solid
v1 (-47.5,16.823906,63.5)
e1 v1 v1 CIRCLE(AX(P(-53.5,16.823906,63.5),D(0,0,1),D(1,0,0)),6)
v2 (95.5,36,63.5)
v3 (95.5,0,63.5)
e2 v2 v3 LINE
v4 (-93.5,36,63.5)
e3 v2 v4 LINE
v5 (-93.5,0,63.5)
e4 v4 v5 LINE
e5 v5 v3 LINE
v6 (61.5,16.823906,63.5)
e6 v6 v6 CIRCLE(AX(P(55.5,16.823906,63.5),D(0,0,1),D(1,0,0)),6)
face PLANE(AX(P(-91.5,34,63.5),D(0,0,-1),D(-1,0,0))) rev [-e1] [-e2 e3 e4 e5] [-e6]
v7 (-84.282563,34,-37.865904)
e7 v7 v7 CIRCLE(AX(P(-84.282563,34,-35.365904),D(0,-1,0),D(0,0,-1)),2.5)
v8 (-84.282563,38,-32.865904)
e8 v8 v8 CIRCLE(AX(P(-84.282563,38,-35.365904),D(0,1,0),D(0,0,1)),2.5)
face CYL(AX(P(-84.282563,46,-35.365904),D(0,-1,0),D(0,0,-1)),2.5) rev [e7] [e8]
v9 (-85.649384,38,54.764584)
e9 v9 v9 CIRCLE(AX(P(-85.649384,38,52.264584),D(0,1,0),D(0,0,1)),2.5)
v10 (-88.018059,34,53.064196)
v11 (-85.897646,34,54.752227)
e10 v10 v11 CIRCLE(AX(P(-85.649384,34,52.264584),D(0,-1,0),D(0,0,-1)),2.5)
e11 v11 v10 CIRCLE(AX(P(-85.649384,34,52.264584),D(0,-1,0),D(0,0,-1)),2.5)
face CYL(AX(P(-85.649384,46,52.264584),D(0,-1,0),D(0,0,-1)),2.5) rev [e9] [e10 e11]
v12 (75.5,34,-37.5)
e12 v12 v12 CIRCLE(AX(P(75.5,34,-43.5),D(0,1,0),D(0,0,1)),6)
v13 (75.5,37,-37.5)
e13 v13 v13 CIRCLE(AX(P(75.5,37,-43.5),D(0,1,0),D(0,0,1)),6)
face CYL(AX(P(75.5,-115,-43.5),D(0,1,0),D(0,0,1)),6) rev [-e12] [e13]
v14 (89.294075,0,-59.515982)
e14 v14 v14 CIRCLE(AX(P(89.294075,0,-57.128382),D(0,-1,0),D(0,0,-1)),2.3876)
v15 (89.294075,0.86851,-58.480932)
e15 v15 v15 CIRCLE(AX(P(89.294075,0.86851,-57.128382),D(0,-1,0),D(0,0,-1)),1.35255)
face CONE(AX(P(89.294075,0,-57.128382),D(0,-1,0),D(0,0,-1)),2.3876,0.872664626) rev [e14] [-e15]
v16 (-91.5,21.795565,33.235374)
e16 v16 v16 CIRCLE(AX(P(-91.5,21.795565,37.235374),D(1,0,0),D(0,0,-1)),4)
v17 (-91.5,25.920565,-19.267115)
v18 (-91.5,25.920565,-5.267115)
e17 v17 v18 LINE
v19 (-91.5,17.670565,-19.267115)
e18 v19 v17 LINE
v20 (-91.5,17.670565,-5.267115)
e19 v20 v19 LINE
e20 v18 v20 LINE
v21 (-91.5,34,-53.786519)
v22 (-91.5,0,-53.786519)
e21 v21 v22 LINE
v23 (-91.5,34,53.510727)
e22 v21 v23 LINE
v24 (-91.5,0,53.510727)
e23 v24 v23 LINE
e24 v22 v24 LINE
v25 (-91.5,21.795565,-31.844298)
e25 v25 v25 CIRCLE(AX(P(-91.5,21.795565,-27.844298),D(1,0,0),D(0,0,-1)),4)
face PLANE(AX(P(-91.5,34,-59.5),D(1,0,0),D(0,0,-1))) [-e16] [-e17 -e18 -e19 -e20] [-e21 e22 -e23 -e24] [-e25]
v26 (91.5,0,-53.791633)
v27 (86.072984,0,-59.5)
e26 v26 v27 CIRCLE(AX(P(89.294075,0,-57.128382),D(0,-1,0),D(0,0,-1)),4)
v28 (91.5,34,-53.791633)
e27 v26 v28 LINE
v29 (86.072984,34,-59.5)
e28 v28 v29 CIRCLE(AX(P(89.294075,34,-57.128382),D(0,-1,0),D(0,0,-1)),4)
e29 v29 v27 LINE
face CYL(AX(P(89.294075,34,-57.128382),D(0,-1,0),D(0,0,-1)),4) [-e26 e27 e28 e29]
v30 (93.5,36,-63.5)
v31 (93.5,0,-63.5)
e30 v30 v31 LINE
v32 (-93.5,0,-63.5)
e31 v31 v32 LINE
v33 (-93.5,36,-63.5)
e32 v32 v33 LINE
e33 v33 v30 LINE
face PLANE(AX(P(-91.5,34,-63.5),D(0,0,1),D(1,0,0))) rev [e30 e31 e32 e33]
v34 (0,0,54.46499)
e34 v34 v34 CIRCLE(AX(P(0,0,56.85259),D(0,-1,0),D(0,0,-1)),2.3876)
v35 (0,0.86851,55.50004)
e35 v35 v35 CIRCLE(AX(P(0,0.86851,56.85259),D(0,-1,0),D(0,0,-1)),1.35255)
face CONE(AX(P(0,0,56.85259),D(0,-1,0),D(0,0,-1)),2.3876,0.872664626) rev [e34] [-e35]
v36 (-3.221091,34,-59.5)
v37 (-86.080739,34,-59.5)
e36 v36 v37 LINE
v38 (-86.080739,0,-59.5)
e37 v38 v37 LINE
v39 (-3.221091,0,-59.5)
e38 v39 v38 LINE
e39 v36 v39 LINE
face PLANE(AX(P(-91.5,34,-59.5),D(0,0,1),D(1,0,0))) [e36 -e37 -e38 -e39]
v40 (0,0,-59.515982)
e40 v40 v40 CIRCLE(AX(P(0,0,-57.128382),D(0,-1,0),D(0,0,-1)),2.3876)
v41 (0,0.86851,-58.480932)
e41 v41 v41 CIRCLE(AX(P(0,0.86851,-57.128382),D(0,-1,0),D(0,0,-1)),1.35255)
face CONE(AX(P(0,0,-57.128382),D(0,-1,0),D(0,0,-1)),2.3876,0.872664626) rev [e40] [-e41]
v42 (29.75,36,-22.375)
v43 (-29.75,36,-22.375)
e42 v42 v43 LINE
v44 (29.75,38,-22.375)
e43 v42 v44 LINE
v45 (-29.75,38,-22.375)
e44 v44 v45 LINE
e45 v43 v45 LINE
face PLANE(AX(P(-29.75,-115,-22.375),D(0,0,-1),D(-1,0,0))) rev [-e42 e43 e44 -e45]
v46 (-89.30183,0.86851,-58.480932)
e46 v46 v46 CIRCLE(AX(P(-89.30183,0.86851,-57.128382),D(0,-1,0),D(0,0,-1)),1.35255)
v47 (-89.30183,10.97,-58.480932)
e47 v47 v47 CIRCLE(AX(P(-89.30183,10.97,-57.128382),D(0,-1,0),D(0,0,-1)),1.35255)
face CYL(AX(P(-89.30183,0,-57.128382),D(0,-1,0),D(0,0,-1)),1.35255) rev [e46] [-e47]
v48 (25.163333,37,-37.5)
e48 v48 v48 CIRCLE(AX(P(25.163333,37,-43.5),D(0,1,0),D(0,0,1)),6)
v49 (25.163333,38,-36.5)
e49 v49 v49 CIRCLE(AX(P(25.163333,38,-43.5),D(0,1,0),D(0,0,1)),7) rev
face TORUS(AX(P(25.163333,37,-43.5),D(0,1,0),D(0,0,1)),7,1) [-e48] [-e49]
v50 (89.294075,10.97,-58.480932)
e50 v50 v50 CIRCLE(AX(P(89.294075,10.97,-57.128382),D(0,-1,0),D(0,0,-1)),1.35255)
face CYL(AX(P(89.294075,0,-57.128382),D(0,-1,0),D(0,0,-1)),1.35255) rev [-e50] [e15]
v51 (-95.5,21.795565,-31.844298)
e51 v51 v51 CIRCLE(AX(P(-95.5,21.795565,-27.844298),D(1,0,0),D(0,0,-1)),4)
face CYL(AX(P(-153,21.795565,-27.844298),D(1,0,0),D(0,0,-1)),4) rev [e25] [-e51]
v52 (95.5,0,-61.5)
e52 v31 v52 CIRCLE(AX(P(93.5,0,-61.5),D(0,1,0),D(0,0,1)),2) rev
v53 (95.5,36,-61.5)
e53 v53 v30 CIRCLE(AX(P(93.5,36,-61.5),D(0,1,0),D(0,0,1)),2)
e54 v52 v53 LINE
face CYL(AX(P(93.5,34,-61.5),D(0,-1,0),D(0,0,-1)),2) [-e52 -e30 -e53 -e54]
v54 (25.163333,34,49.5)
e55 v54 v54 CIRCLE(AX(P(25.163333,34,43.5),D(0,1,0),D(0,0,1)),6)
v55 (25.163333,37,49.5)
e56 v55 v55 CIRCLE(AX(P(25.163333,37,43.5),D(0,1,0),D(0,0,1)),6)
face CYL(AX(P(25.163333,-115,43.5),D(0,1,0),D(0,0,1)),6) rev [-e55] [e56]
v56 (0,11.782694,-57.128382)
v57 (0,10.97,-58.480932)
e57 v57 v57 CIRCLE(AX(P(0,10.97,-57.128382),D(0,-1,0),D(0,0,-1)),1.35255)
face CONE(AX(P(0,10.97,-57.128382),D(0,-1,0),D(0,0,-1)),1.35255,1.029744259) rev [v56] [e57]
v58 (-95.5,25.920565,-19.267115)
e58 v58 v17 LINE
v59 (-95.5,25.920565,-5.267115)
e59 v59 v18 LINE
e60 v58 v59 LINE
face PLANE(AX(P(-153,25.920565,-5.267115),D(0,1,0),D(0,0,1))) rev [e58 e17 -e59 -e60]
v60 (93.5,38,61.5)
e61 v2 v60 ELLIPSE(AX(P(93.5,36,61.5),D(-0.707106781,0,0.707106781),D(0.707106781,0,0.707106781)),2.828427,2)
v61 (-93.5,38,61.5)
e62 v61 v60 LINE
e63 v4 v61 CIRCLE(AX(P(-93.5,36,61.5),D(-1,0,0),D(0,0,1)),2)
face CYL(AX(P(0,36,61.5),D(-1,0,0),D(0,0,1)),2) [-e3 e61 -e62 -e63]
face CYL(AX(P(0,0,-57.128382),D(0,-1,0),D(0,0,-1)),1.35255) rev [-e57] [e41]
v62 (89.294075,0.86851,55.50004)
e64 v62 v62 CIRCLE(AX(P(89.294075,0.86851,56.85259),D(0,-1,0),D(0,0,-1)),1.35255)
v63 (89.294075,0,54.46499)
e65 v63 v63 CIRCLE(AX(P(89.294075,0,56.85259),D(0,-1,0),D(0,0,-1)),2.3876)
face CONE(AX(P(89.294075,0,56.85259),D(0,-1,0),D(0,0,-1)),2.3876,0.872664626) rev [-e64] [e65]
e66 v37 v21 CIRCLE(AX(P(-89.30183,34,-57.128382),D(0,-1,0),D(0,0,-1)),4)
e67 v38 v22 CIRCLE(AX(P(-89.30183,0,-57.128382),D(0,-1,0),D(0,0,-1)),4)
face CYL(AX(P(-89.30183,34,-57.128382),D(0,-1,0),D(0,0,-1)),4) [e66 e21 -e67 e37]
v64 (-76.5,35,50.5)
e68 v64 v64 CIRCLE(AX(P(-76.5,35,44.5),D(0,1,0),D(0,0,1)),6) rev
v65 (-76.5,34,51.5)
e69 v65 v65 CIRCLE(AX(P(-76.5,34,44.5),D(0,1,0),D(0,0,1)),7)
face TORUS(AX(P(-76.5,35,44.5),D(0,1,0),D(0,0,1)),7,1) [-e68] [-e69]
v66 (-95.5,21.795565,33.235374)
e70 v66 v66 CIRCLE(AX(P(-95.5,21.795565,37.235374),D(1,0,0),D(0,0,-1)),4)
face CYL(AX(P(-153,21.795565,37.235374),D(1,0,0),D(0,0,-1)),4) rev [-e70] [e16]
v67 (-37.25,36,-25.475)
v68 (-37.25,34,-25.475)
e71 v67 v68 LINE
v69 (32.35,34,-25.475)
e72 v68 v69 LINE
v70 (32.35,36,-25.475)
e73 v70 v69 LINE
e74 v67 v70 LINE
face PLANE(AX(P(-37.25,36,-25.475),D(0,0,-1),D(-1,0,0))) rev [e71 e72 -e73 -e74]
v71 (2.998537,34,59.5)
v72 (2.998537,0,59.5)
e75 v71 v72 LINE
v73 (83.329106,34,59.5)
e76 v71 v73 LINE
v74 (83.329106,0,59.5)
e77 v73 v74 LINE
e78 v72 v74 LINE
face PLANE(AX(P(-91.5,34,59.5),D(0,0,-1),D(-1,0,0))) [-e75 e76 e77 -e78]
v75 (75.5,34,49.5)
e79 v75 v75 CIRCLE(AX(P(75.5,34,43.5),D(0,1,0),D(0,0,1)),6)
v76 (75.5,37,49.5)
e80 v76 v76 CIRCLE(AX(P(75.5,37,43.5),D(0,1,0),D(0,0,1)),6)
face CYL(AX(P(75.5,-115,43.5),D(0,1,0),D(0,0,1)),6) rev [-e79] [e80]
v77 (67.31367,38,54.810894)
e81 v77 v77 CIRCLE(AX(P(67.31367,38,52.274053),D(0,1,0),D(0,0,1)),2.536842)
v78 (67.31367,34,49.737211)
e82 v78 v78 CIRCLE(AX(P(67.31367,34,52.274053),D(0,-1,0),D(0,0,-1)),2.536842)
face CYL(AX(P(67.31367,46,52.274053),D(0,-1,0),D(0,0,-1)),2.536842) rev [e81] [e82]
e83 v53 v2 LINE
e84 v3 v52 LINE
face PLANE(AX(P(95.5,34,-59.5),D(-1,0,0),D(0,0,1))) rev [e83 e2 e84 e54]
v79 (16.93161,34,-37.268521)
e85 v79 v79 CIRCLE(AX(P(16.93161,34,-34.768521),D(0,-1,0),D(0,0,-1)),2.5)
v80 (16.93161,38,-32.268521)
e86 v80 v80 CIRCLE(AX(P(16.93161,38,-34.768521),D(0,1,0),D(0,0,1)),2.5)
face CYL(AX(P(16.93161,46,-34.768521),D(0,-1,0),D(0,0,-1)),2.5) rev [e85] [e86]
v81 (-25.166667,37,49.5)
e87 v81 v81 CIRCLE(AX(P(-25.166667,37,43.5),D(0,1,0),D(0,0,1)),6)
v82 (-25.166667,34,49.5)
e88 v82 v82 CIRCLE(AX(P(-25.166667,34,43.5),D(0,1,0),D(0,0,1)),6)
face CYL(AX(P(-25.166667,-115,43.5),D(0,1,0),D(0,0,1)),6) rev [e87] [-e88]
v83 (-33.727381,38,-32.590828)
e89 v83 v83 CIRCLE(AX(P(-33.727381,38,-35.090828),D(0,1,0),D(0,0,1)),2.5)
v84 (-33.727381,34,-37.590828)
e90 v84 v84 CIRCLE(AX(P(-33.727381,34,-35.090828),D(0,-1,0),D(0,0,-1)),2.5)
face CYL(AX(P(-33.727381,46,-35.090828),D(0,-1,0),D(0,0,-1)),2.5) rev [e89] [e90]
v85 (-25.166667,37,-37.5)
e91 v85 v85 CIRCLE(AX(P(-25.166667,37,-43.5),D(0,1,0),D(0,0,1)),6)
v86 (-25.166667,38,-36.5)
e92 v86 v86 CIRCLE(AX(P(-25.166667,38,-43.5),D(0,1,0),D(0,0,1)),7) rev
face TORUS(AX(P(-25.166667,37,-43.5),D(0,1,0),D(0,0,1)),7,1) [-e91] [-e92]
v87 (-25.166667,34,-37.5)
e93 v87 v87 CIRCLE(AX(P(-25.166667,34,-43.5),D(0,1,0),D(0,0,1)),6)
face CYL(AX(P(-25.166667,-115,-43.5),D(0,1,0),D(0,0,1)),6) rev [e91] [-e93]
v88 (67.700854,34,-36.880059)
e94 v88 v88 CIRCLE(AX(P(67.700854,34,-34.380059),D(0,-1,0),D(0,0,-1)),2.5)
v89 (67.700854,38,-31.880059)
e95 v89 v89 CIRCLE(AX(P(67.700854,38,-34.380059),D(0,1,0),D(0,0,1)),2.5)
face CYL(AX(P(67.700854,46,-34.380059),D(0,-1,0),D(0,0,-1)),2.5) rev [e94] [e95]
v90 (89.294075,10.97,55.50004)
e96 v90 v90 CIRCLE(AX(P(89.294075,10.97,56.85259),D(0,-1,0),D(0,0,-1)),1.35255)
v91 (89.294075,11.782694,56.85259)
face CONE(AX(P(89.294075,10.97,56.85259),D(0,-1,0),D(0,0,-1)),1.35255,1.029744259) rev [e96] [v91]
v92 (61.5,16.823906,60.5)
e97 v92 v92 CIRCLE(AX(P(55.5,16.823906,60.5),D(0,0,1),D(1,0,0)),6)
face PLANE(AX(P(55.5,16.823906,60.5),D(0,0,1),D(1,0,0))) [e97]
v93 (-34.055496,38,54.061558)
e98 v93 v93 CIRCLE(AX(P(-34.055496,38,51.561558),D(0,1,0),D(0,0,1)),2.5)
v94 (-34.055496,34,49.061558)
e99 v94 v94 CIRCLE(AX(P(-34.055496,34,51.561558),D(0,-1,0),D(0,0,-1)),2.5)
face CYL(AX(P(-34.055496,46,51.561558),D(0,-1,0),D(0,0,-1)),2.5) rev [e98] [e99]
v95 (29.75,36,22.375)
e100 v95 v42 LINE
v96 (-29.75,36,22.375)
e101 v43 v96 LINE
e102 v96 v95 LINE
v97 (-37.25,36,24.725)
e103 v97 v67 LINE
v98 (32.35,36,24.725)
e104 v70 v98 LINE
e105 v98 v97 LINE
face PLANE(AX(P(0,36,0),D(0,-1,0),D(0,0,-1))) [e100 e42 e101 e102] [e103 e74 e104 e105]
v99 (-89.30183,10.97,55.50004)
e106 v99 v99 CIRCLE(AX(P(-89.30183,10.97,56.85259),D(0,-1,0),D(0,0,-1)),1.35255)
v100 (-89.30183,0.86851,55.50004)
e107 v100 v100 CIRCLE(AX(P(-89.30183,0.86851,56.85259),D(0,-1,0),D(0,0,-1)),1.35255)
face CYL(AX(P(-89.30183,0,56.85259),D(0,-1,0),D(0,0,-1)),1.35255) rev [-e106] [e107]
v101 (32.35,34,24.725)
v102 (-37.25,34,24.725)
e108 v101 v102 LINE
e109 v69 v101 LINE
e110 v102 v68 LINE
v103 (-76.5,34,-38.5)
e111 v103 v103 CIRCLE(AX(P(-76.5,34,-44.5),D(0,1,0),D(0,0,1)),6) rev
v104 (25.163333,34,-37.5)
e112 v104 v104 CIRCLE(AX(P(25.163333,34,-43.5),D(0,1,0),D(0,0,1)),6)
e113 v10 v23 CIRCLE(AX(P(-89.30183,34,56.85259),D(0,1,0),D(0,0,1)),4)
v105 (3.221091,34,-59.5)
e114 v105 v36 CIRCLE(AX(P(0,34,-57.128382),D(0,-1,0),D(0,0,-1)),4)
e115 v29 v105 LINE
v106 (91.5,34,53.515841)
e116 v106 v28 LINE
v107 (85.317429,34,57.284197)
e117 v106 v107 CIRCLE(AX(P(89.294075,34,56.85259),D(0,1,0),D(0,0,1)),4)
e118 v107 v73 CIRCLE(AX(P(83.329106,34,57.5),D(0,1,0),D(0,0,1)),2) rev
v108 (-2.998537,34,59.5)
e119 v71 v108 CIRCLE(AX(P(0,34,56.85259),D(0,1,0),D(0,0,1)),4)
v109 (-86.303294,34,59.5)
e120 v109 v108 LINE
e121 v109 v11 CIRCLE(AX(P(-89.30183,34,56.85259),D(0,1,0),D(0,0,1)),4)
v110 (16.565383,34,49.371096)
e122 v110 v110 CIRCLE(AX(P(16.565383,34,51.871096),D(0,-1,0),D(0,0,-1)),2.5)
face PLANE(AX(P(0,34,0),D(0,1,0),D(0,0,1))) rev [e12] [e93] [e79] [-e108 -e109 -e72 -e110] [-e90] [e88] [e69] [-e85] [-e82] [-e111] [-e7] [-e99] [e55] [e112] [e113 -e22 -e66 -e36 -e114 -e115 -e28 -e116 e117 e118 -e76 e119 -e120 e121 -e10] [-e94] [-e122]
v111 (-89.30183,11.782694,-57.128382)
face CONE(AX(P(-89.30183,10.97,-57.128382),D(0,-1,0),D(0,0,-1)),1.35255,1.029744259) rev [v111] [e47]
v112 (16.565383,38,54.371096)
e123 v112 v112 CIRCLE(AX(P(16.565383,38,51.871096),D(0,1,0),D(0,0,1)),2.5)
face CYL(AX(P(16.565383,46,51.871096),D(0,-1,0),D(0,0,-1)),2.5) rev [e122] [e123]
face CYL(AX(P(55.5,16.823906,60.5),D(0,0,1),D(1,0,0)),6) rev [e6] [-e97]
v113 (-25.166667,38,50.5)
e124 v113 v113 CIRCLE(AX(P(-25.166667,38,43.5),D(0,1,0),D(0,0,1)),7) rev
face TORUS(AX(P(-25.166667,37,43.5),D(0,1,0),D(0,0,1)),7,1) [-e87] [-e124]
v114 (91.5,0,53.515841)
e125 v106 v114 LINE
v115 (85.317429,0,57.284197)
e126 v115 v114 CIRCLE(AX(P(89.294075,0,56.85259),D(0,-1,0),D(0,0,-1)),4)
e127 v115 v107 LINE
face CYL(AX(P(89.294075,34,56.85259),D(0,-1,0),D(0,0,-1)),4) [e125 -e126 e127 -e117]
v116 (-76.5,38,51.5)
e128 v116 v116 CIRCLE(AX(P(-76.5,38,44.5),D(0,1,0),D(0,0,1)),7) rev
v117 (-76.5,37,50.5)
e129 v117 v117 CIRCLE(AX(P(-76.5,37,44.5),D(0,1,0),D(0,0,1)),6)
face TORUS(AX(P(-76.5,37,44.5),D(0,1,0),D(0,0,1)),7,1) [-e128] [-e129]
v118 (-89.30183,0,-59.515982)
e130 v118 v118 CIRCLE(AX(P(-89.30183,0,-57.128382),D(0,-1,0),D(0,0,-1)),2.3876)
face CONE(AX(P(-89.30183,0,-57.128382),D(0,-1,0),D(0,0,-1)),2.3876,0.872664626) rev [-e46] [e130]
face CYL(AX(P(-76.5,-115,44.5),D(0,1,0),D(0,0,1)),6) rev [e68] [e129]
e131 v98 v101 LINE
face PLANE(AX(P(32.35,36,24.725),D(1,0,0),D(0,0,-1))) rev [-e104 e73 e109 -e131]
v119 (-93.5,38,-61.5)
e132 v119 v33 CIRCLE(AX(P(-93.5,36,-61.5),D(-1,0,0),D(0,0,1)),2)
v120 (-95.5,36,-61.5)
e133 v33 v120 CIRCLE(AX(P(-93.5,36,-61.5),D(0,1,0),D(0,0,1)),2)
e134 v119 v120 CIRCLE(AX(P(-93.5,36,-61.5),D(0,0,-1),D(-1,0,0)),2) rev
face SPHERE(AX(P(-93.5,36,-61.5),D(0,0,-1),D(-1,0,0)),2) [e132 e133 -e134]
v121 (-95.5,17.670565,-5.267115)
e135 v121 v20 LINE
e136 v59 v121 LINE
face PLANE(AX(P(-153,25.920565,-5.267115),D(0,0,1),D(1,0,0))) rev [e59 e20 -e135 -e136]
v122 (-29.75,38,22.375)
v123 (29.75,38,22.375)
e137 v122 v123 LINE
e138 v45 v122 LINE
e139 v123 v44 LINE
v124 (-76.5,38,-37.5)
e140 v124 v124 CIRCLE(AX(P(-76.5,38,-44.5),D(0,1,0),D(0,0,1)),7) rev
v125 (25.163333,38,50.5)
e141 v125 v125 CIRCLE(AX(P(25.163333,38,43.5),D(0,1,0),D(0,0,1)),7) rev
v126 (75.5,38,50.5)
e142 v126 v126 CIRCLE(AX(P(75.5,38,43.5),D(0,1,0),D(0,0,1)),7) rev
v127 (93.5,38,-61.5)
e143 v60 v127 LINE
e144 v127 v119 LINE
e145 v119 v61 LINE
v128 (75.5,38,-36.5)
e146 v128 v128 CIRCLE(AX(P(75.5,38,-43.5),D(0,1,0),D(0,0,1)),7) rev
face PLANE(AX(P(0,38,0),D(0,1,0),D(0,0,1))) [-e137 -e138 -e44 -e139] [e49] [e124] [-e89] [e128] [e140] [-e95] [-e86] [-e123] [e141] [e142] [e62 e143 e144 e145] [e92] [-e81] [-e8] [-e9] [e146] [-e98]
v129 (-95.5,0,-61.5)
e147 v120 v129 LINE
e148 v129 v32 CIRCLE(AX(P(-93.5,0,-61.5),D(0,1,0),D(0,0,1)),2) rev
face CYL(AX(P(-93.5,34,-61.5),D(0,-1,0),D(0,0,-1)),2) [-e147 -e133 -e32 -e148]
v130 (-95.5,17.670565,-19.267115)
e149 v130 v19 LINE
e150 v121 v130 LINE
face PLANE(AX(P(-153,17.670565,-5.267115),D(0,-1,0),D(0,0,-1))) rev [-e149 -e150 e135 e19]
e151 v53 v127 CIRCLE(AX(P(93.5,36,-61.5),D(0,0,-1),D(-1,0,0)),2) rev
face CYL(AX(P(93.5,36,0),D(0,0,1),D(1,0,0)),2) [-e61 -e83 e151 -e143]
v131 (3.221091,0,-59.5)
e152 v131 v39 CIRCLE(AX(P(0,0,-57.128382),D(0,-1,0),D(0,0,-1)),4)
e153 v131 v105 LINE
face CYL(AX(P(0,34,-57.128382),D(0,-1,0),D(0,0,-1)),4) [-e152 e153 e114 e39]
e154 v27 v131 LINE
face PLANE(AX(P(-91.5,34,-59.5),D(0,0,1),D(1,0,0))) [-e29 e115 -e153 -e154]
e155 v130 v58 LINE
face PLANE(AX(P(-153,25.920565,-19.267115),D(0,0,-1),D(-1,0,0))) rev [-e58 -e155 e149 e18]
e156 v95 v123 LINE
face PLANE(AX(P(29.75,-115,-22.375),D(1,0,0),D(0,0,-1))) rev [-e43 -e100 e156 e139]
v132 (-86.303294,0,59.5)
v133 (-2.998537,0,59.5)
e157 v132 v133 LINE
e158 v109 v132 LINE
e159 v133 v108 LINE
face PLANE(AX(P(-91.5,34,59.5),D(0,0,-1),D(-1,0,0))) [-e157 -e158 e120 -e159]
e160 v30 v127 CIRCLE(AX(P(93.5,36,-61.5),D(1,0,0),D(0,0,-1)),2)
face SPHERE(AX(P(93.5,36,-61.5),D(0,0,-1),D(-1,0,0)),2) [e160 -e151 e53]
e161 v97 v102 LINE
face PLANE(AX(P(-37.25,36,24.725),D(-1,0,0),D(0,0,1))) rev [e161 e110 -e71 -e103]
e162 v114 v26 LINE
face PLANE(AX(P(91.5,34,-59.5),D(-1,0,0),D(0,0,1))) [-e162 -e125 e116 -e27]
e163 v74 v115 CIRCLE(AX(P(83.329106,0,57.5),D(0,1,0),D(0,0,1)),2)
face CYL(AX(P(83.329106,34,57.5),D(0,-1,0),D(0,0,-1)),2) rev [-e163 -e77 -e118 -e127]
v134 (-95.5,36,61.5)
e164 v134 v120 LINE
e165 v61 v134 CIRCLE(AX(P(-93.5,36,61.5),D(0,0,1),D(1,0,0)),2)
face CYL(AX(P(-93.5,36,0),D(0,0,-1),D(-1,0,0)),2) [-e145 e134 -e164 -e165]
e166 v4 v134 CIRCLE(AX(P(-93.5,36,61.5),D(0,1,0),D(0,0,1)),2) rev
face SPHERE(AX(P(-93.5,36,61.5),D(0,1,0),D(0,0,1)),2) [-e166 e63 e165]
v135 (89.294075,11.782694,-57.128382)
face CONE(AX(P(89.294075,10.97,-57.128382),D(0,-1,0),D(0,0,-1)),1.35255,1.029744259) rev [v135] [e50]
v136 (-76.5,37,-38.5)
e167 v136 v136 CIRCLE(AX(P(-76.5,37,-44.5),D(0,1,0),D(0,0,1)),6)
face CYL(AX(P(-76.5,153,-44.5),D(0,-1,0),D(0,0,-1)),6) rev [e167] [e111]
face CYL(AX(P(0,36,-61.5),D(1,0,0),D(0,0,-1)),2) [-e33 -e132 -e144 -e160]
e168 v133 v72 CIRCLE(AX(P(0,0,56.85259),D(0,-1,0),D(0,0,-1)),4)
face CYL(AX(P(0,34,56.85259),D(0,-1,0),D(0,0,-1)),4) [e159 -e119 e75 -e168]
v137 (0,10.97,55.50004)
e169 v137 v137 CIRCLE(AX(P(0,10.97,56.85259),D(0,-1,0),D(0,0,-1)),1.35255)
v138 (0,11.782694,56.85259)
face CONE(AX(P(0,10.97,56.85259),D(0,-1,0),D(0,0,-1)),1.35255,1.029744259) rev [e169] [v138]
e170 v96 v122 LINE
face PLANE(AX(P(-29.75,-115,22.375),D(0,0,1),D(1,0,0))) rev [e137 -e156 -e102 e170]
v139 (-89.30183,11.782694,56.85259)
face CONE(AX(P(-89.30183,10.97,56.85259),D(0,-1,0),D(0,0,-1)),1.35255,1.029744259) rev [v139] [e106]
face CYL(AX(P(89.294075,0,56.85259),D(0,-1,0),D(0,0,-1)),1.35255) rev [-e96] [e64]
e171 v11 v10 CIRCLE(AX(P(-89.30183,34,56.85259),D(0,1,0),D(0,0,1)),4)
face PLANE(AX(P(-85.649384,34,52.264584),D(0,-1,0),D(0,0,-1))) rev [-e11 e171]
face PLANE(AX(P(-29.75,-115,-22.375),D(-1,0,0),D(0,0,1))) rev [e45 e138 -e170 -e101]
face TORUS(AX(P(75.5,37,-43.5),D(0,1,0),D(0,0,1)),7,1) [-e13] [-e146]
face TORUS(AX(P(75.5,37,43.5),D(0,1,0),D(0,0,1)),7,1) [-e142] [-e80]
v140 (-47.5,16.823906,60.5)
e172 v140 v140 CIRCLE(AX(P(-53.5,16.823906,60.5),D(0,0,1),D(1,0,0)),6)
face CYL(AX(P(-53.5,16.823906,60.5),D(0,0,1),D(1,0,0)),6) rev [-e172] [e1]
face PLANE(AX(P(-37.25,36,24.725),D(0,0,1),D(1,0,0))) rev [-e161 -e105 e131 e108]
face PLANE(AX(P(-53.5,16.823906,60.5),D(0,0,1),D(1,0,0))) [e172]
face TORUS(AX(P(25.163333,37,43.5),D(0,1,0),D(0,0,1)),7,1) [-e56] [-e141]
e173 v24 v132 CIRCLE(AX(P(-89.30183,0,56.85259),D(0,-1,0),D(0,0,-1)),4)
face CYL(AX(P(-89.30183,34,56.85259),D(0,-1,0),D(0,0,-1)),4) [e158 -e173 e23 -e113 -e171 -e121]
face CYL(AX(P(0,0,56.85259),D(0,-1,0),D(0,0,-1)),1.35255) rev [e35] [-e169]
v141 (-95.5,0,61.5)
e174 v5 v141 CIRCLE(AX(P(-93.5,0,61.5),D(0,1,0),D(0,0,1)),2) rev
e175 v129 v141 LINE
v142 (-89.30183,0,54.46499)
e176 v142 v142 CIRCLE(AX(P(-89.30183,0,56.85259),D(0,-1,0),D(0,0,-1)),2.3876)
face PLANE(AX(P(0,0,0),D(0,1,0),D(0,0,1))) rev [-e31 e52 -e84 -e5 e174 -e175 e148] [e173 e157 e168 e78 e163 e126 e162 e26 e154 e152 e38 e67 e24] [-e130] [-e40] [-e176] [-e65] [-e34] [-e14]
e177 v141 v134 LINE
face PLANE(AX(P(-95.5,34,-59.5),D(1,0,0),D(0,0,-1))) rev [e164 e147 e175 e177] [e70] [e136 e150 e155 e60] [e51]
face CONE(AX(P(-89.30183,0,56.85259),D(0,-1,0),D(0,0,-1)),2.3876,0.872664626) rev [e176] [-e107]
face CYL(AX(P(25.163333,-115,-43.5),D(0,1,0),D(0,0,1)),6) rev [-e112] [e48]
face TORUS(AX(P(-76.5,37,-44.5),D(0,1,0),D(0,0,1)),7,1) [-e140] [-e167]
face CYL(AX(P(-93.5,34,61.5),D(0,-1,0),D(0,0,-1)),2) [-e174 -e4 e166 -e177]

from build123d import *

# Parameters (mm, degrees)
SKETCH11_W                      = 183
SKETCH11_H                      = 119
BOSS_EXTRUDE2_DEPTH             = 34
SHELL19_T                       = 4
BOSS_EXTRUDE4_START             = -34
BOSS_EXTRUDE4_DEPTH             = 34
F_6_32_TAPPED_HOLE1_D           = 2.7051
F_6_32_TAPPED_HOLE1_DEPTH       = 10.97
F_6_32_TAPPED_HOLE1_CSINK_D     = 4.7752
F_6_32_TAPPED_HOLE1_CSINK_ANGLE = 100
F_6_32_TAPPED_HOLE1_TIP         = 0.81269403
FILLET1_R                       = 2
SKETCH15_R                      = 6
CUT_EXTRUDE2_DEPTH              = 153
FILLET2_R                       = 1
SKETCH16_R                      = 6
SKETCH16_W                      = 59.5
SKETCH16_H                      = 44.75
CUT_EXTRUDE3_DEPTH              = 153
FILLET3_R                       = 1
FILLET4_R                       = 1
FILLET5_R                       = 1
FILLET6_R                       = 1
FILLET7_R                       = 1
FILLET8_R                       = 1
FILLET9_R                       = 1
FILLET10_R                      = 1
SKETCH19_R                      = 4
SKETCH19_W                      = 14
SKETCH19_H                      = 8.25
CUT_EXTRUDE4_DEPTH              = 153
SKETCH17_R                      = 6
CUT_EXTRUDE5_DEPTH              = 3
SKETCH22_W                      = 69.6
SKETCH22_H                      = 50.2
CUT_EXTRUDE6_DEPTH              = 2
SKETCH23_R                      = 2.5
SKETCH23_R_2                    = 2.53684151
CUT_EXTRUDE7_DEPTH              = 12


# Read off the part's stored shape, not the designer's step: Boss-Extrude4
with BuildPart() as part:
    # Sketch11 → Boss-Extrude2 (new body)
    with BuildSketch(Plane(origin=(0, 0, 0), x_dir=(1, 0, 0), z_dir=(0, 1, 0))):
        Rectangle(SKETCH11_W, SKETCH11_H)
    extrude(amount=BOSS_EXTRUDE2_DEPTH)

    # Shell19
    shell19_openings = [part.faces().sort_by_distance(p)[0] for p in [
        (0, 0, 0),
    ]]
    offset(amount=SHELL19_T, openings=shell19_openings, kind=Kind.INTERSECTION)

    # Boss-Extrude4 outline → Boss-Extrude4 (add)
    with BuildSketch(Plane(origin=(0, 0, 0), x_dir=(-1, 0, 0), z_dir=(0, -1, 0)).offset(BOSS_EXTRUDE4_START)):
        with BuildLine():
            Line((-91.5, 59.5), (-91.5, 53.791632513))
            ThreePointArc((-91.5, 53.791632513), (-86.395109023, 54.372298689), (-86.072984276, 59.5))
            Line((-86.072984276, 59.5), (-91.5, 59.5))
        make_face()
        with BuildLine():
            ThreePointArc((-86.295538716, -59.5), (-86.27586418, -54.227632818), (-91.5, -53.51584091))
            Line((-91.5, -53.51584091), (-91.5, -59.5))
            Line((-91.5, -59.5), (-86.295538716, -59.5))
        make_face()
        with BuildLine():
            Line((3.221091031, 59.5), (-3.221091031, 59.5))
            ThreePointArc((-3.221091031, 59.5), (0, 53.128381867), (3.221091031, 59.5))
        make_face()
        with BuildLine():
            ThreePointArc((2.998536591, -59.5), (0, -52.852590264), (-2.998536591, -59.5))
            Line((-2.998536591, -59.5), (2.998536591, -59.5))
        make_face()
        with BuildLine():
            Line((91.5, 59.5), (86.08073914, 59.5))
            ThreePointArc((86.08073914, 59.5), (86.399665621, 54.375666676), (91.5, 53.786518703))
            Line((91.5, 53.786518703), (91.5, 59.5))
        make_face()
        with BuildLine():
            ThreePointArc((91.5, -53.5107271), (86.280573114, -54.231139178), (86.30329358, -59.5))
            Line((86.30329358, -59.5), (91.5, -59.5))
            Line((91.5, -59.5), (91.5, -53.5107271))
        make_face()
    extrude(amount=BOSS_EXTRUDE4_DEPTH)

    # #6-32 Tapped Hole1
    with Locations(Plane(origin=(0, 0, 0), x_dir=(-1, 0, 0), z_dir=(0, -1, 0))):
        with Locations((-89.294075307, 57.128381867), (-89.294075307, -56.852590264), (0, -56.852590264), (0, 57.128381867), (89.301830171, 57.128381867), (89.301830171, -56.852590264)):
            CounterSinkHole(F_6_32_TAPPED_HOLE1_D / 2, F_6_32_TAPPED_HOLE1_CSINK_D / 2, depth=F_6_32_TAPPED_HOLE1_DEPTH, counter_sink_angle=F_6_32_TAPPED_HOLE1_CSINK_ANGLE)
            with Locations((0, 0, -(F_6_32_TAPPED_HOLE1_DEPTH + F_6_32_TAPPED_HOLE1_TIP / 2))):  # 118° drill point
                Cone(0, F_6_32_TAPPED_HOLE1_D / 2, F_6_32_TAPPED_HOLE1_TIP, mode=Mode.SUBTRACT)

    # Fillet1
    fillet1_edges = [part.edges().sort_by_distance(p)[0] for p in [
        (-95.5, 38, 0),
        (0, 38, 63.5),
        (95.5, 38, 0),
        (86.295538716, 17, 59.5),
        (-95.5, 19, 63.5),
        (-95.5, 19, -63.5),
        (95.5, 19, -63.5),
        (0, 38, -63.5),
    ]]
    fillet(fillet1_edges, radius=FILLET1_R)

    # Sketch15 → Cut-Extrude2 (cut)
    with BuildSketch(Plane(origin=(0, 0, 0), x_dir=(1, 0, 0), z_dir=(0, 1, 0))):
        with Locations(Location((-76.5, 44.5, 0), (0, 0, 270))):
            Circle(SKETCH15_R)
    extrude(amount=CUT_EXTRUDE2_DEPTH, mode=Mode.SUBTRACT)

    # Fillet2
    fillet2_edges = [part.edges().sort_by_distance(p)[0] for p in [
        (-76.5, 38, -50.5),
    ]]
    fillet(fillet2_edges, radius=FILLET2_R)

    # Sketch16 → Cut-Extrude3 (cut)
    with BuildSketch(Plane(origin=(0, 38, 0), x_dir=(1, 0, 0), z_dir=(0, 1, 0))):
        with Locations(Location((75.5, 43.5, 0), (0, 0, 270))):
            Circle(SKETCH16_R)
        with Locations(Location((-25.166666667, 43.5, 0), (0, 0, 270))):
            Circle(SKETCH16_R)
        with Locations(Location((25.163333333, 43.5, 0), (0, 0, 270))):
            Circle(SKETCH16_R)
        with Locations(Location((-76.5, -44.5, 0), (0, 0, 270))):
            Circle(SKETCH16_R)
        with Locations(Location((75.5, -43.5, 0), (0, 0, 270))):
            Circle(SKETCH16_R)
        with Locations(Location((25.163333333, -43.5, 0), (0, 0, 270))):
            Circle(SKETCH16_R)
        with Locations(Location((-25.166666667, -43.5, 0), (0, 0, 270))):
            Circle(SKETCH16_R)
        Rectangle(SKETCH16_W, SKETCH16_H)
    extrude(amount=-CUT_EXTRUDE3_DEPTH, mode=Mode.SUBTRACT)

    # Fillet3
    fillet3_edges = [part.edges().sort_by_distance(p)[0] for p in [
        (-25.166666667, 38, -49.5),
    ]]
    fillet(fillet3_edges, radius=FILLET3_R)

    # Fillet4
    fillet4_edges = [part.edges().sort_by_distance(p)[0] for p in [
        (25.163333333, 38, -49.5),
    ]]
    fillet(fillet4_edges, radius=FILLET4_R)

    # Fillet5
    fillet5_edges = [part.edges().sort_by_distance(p)[0] for p in [
        (75.5, 38, -49.5),
    ]]
    fillet(fillet5_edges, radius=FILLET5_R)

    # Fillet6
    fillet6_edges = [part.edges().sort_by_distance(p)[0] for p in [
        (-76.5, 34, 38.5),
    ]]
    fillet(fillet6_edges, radius=FILLET6_R)

    # Fillet7
    fillet7_edges = [part.edges().sort_by_distance(p)[0] for p in [
        (-76.5, 38, 38.5),
    ]]
    fillet(fillet7_edges, radius=FILLET7_R)

    # Fillet8
    fillet8_edges = [part.edges().sort_by_distance(p)[0] for p in [
        (-25.166666667, 38, 37.5),
    ]]
    fillet(fillet8_edges, radius=FILLET8_R)

    # Fillet9
    fillet9_edges = [part.edges().sort_by_distance(p)[0] for p in [
        (25.163333333, 38, 37.5),
    ]]
    fillet(fillet9_edges, radius=FILLET9_R)

    # Fillet10
    fillet10_edges = [part.edges().sort_by_distance(p)[0] for p in [
        (75.5, 38, 37.5),
    ]]
    fillet(fillet10_edges, radius=FILLET10_R)

    # Sketch19 → Cut-Extrude4 (cut)
    with BuildSketch(Plane(origin=(0, 0, 0), x_dir=(0, 0, -1), z_dir=(1, 0, 0))):
        with Locations((-37.235373994, 21.795565076)):
            Circle(SKETCH19_R)
        with Locations((27.844297641, 21.795565076)):
            Circle(SKETCH19_R)
        with Locations((12.267115017, 21.795565076)):
            Rectangle(SKETCH19_W, SKETCH19_H)
    extrude(amount=-CUT_EXTRUDE4_DEPTH, mode=Mode.SUBTRACT)

    # Sketch17 → Cut-Extrude5 (cut)
    with BuildSketch(Plane.XY.offset(63.5)):
        with Locations((-53.5, 16.823905987)):
            Circle(SKETCH17_R)
        with Locations((55.5, 16.823905987)):
            Circle(SKETCH17_R)
    extrude(amount=-CUT_EXTRUDE5_DEPTH, mode=Mode.SUBTRACT)

    # Sketch22 → Cut-Extrude6 (cut)
    with BuildSketch(Plane(origin=(0, 34, 0), x_dir=(-1, 0, 0), z_dir=(0, -1, 0))):
        with Locations((2.45, 0.375)):
            Rectangle(SKETCH22_W, SKETCH22_H)
    extrude(amount=-CUT_EXTRUDE6_DEPTH, mode=Mode.SUBTRACT)

    # Sketch23 → Cut-Extrude7 (cut)
    with BuildSketch(Plane(origin=(0, 34, 0), x_dir=(-1, 0, 0), z_dir=(0, -1, 0))):
        with Locations(Location((85.649384472, -52.264583941, 0), (0, 0, 341.346464008))):
            Circle(SKETCH23_R)
        with Locations(Location((34.055496103, -51.56155762, 0), (0, 0, 90))):
            Circle(SKETCH23_R)
        with Locations(Location((-16.565382545, -51.871095642, 0), (0, 0, 90))):
            Circle(SKETCH23_R)
        with Locations(Location((-67.313670084, -52.274052798, 0), (0, 0, 90))):
            Circle(SKETCH23_R_2)
        with Locations(Location((84.282563307, 35.365904075, 0), (0, 0, 90))):
            Circle(SKETCH23_R)
        with Locations(Location((33.727380609, 35.090827818, 0), (0, 0, 90))):
            Circle(SKETCH23_R)
        with Locations(Location((-16.931610068, 34.768520625, 0), (0, 0, 90))):
            Circle(SKETCH23_R)
        with Locations(Location((-67.700854063, 34.380059065, 0), (0, 0, 90))):
            Circle(SKETCH23_R)
    extrude(amount=-CUT_EXTRUDE7_DEPTH, mode=Mode.SUBTRACT)


solid = part.part
